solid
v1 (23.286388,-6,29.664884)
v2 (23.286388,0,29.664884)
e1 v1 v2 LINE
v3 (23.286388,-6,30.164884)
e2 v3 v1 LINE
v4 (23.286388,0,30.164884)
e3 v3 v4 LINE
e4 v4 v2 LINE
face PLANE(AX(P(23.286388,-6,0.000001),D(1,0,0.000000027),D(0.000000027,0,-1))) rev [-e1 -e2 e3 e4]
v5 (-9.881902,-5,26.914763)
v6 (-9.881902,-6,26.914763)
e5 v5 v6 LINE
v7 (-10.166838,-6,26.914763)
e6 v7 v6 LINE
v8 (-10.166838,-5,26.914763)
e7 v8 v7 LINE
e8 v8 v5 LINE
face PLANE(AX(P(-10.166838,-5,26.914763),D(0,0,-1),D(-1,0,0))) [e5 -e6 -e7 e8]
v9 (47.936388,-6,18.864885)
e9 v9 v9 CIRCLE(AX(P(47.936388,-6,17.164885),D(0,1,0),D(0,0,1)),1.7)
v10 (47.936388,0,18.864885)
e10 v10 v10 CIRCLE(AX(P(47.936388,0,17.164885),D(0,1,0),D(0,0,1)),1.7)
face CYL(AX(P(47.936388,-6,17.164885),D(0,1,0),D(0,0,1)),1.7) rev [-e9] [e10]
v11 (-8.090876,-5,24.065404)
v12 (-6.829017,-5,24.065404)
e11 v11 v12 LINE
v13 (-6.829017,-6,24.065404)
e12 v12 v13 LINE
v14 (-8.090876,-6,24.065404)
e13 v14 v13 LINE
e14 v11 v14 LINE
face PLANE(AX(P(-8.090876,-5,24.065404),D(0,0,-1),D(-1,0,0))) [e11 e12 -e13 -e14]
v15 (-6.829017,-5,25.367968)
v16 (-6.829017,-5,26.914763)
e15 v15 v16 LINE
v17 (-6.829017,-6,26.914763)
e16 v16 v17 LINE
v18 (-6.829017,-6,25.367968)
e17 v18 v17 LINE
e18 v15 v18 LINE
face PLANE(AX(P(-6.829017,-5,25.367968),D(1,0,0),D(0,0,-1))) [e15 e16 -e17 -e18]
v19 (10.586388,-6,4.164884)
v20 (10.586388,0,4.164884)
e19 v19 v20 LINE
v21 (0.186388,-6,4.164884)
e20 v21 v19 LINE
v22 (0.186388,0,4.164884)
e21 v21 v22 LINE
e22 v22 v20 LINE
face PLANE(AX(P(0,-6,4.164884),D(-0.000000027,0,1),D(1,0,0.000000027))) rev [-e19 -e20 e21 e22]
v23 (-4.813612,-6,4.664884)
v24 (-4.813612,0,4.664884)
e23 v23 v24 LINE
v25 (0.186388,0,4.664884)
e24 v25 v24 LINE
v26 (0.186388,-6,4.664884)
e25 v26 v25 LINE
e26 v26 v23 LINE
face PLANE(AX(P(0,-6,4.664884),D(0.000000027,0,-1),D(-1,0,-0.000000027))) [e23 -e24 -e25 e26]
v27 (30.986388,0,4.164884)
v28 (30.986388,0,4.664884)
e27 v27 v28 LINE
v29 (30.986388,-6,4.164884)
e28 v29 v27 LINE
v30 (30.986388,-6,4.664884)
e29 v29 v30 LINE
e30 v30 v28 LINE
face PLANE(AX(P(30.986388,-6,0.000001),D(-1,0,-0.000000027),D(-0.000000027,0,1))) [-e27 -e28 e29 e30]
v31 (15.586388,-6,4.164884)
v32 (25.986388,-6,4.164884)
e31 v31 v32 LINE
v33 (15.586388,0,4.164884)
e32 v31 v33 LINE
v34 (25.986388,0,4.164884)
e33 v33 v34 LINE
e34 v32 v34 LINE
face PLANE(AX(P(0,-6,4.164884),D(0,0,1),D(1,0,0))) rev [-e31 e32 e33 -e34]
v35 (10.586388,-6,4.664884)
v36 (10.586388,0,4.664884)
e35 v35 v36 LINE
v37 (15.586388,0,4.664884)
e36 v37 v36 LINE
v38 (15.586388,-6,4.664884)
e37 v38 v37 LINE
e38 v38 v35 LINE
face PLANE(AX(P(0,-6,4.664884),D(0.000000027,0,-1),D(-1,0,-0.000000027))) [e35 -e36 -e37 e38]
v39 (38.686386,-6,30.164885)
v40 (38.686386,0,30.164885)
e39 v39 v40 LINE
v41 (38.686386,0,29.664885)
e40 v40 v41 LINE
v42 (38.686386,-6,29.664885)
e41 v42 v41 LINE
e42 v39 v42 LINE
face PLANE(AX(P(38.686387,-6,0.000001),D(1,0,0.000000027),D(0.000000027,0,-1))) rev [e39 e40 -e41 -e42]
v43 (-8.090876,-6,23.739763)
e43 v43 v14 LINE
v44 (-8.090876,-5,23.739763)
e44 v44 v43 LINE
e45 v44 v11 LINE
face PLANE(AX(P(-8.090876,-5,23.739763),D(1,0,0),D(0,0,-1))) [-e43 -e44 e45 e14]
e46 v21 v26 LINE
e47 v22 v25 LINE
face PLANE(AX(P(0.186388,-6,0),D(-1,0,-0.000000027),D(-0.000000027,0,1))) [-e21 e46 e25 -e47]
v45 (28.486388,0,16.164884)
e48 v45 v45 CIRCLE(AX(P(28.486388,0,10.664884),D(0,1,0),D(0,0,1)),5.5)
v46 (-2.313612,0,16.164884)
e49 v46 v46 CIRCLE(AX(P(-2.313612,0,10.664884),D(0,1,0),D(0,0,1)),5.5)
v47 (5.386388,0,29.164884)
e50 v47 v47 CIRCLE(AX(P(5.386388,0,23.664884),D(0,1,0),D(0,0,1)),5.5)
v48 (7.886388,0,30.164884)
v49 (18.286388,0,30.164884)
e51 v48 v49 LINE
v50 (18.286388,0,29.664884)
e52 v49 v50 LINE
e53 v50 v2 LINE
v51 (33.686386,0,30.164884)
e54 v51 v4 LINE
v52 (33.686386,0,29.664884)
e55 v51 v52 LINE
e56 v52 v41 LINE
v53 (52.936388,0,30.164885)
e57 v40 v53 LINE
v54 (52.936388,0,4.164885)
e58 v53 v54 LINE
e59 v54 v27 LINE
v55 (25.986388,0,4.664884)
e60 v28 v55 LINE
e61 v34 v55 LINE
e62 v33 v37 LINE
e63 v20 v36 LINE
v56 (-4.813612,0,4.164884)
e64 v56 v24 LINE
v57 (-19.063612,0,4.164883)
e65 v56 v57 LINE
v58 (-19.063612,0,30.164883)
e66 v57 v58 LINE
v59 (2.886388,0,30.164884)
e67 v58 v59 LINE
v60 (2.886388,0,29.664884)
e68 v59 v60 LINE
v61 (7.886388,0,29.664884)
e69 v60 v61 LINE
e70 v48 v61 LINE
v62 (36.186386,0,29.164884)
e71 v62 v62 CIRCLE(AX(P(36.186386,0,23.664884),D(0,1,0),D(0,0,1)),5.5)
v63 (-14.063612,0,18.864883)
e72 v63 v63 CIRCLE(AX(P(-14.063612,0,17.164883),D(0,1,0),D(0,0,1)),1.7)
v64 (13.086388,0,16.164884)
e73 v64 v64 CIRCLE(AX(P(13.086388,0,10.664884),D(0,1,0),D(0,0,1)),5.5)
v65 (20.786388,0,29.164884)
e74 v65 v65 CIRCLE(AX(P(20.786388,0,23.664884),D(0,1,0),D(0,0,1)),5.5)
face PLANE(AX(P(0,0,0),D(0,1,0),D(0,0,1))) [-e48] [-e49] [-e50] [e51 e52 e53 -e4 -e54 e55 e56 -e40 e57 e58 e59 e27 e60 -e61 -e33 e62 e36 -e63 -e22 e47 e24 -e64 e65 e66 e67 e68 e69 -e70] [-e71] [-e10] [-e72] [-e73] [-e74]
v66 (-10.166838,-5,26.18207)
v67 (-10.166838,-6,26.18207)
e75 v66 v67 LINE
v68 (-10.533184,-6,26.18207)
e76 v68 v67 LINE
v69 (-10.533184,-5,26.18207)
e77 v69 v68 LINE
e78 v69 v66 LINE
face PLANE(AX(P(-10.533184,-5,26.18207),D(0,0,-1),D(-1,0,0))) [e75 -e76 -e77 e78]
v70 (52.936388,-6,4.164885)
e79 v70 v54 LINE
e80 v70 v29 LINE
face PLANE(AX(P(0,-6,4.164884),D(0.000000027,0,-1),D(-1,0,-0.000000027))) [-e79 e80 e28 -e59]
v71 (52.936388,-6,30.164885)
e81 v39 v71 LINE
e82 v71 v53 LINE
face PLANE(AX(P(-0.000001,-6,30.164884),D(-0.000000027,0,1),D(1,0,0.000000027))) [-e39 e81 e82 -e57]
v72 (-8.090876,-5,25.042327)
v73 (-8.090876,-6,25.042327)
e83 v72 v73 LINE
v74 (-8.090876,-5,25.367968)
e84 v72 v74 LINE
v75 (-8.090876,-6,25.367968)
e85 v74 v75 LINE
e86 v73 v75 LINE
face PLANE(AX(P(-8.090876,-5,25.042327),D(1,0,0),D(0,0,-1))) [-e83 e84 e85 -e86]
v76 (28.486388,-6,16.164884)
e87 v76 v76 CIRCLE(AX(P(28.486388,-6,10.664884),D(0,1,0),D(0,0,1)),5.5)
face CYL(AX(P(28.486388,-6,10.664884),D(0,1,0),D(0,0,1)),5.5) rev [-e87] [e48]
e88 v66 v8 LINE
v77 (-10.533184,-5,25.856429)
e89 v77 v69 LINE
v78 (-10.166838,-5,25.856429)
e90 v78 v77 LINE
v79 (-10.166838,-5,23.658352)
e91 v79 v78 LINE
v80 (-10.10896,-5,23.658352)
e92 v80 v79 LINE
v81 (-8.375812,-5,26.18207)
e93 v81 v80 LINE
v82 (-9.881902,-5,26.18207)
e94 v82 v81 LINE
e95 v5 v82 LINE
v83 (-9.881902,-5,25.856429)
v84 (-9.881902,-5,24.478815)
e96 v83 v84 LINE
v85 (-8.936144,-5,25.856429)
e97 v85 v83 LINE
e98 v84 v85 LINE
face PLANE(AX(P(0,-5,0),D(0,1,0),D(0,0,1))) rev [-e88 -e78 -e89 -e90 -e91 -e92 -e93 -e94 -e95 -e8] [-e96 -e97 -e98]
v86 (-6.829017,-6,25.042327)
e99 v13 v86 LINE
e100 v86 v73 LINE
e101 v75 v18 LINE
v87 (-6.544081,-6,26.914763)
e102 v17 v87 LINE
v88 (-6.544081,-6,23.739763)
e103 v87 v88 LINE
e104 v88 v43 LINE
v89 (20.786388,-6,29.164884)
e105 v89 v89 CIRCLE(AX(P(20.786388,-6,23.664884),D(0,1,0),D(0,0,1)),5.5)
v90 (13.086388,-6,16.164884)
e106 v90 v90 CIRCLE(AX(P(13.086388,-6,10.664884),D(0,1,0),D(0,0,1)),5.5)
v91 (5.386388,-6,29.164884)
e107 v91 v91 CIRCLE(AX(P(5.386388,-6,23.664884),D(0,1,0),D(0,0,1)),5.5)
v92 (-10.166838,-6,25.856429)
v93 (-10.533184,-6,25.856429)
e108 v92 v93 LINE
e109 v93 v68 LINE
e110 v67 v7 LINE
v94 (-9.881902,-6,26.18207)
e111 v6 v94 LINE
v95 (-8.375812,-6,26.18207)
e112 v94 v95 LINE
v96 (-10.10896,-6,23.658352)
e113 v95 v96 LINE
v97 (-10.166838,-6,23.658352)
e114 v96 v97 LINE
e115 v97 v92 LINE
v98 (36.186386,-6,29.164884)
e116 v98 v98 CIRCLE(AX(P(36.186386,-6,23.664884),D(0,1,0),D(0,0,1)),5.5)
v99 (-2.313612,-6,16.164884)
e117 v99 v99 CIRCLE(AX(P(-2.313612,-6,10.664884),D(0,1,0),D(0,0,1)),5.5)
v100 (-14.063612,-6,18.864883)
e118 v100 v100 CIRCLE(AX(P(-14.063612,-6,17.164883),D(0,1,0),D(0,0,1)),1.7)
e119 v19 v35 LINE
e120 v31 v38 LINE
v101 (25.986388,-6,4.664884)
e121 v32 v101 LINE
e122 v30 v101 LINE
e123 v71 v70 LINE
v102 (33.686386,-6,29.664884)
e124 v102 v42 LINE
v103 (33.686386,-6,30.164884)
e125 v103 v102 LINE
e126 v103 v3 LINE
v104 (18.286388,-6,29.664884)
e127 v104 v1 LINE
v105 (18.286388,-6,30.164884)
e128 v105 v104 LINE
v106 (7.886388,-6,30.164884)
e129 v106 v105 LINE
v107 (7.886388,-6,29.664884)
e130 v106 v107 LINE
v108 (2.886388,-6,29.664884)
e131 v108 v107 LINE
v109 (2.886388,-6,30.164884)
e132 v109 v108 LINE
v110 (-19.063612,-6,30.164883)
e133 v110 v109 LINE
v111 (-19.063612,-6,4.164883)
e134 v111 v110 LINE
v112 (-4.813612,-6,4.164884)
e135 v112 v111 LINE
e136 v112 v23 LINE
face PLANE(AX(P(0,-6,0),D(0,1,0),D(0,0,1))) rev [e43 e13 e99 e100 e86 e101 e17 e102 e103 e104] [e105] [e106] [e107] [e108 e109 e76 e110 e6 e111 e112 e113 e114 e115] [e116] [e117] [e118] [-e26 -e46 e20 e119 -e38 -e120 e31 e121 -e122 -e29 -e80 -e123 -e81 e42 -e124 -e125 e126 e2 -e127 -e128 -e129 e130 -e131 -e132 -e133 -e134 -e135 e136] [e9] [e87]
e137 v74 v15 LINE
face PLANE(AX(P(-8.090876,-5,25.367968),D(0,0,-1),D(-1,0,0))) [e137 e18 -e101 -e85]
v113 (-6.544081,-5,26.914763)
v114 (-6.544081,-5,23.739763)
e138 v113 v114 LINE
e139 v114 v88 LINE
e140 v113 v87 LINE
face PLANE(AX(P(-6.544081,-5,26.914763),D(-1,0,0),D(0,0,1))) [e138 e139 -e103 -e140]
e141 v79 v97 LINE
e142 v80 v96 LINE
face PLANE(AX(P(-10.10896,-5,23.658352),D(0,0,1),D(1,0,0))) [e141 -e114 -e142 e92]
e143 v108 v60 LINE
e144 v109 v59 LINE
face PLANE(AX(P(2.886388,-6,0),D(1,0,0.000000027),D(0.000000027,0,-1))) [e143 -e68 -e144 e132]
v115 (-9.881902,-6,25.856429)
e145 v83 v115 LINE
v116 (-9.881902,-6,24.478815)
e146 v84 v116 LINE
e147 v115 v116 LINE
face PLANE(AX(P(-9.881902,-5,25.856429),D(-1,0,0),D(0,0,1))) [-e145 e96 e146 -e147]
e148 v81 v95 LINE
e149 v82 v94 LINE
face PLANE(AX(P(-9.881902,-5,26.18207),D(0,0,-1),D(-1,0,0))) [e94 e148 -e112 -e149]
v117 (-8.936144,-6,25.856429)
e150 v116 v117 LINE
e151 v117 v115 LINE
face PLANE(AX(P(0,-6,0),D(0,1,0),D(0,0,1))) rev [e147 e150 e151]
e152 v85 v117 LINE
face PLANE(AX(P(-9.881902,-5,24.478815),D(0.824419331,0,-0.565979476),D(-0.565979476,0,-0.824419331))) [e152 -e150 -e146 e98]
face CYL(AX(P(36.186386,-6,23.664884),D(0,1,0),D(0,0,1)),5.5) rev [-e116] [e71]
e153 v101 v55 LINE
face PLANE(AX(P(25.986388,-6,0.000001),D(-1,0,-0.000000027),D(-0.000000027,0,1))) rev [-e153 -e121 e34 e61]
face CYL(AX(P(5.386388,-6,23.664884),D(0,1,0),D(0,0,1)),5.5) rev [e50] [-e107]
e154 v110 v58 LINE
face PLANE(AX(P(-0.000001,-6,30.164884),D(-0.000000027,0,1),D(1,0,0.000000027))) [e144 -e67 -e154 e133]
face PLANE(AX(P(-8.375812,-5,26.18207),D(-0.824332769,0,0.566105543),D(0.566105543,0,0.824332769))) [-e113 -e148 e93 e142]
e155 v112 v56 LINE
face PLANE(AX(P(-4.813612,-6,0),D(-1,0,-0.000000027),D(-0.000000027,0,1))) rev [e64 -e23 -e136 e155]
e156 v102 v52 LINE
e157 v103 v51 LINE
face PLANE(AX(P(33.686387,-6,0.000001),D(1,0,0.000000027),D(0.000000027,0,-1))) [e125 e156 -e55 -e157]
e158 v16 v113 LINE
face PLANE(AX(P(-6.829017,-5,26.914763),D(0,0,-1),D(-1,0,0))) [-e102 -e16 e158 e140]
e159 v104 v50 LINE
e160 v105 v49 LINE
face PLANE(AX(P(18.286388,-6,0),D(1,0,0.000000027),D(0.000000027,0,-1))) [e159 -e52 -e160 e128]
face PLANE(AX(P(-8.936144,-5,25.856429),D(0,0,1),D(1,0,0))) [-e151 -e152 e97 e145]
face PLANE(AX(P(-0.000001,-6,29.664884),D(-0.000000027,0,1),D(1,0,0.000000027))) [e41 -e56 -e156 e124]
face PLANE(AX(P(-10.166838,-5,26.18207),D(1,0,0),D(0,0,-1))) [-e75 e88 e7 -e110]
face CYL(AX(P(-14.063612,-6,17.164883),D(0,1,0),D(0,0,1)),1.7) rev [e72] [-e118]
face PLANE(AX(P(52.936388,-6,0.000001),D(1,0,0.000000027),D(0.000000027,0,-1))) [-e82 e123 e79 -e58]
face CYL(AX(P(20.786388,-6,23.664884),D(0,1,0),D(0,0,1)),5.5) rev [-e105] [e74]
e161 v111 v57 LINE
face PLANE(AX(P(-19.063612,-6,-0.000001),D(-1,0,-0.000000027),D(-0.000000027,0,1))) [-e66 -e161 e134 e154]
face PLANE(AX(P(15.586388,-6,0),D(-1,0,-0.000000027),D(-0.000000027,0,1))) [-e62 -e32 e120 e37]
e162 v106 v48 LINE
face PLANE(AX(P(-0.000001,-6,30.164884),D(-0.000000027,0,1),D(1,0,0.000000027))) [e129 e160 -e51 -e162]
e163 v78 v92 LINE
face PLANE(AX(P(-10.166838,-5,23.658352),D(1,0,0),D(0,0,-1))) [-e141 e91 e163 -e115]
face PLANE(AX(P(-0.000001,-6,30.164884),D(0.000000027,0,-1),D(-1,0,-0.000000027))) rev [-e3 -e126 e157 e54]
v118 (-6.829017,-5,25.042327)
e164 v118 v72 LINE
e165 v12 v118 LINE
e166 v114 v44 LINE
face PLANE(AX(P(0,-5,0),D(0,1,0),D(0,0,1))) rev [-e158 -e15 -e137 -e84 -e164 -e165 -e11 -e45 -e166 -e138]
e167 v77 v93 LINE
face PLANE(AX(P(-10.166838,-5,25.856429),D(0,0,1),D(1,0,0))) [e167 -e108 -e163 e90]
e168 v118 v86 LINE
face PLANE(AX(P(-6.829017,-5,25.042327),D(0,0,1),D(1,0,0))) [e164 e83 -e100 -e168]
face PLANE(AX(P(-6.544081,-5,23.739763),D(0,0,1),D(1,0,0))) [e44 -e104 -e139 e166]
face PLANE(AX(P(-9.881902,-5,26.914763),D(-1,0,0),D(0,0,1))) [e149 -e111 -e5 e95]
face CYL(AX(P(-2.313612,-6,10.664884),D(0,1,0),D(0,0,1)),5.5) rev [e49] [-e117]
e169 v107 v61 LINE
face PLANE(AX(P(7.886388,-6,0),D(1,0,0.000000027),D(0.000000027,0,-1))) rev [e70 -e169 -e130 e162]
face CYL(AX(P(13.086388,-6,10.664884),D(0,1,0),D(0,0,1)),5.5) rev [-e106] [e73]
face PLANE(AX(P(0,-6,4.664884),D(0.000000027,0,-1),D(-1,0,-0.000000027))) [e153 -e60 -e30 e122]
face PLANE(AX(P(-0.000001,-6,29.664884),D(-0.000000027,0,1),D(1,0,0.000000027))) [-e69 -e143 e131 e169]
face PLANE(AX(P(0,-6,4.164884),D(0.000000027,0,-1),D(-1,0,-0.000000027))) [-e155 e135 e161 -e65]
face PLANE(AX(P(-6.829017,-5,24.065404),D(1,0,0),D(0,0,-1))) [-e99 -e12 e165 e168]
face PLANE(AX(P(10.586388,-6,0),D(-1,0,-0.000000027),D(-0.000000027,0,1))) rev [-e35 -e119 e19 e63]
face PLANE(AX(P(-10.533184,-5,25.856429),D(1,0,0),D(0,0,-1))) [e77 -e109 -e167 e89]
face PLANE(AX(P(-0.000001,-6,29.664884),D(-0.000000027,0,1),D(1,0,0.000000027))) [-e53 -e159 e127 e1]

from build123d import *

# Parameters (mm, degrees)
SKETCH1_R               = 5.5
BOSS_EXTRUDE1_DEPTH     = 6
BOSS_EXTRUDE1_2_DEPTH   = 6
BOSS_EXTRUDE1_3_DEPTH   = 6
BOSS_EXTRUDE1_4_DEPTH   = 6
BOSS_EXTRUDE1_5_DEPTH   = 6
BOSS_EXTRUDE1_6_DEPTH   = 6
BOSS_EXTRUDE2_START     = -6
BOSS_EXTRUDE2_OUTLINE_R = 1.7
BOSS_EXTRUDE2_DEPTH     = 6
CUT_EXTRUDE1_DEPTH      = 1


# Read off the part's stored shape, not the designer's step: Boss-Extrude2
with BuildPart() as part:
    # Sketch1 → Boss-Extrude1 (new body)
    with BuildSketch(Plane(origin=(0, 0, 0), x_dir=(1, 0, 0), z_dir=(0, 1, 0))):
        Polygon((3.686387934, -16.664883738), (3.686388262, -4.664883738), (-8.313611738, -4.66488341), (-8.313612066, -16.66488341), align=None)
        with Locations(Location((-2.313611902, -10.664883574, 0), (0, 0, 270))):
            Circle(SKETCH1_R, mode=Mode.SUBTRACT)
    extrude(amount=-BOSS_EXTRUDE1_DEPTH)



with BuildPart() as body_2:
    # Sketch1 → Boss-Extrude1 2 (new body)
    with BuildSketch(Plane(origin=(0, 0, 0), x_dir=(1, 0, 0), z_dir=(0, 1, 0))):
        Polygon((19.086387939, -16.664884095), (19.086388267, -4.664884095), (7.086388267, -4.664883767), (7.086387939, -16.664883767), align=None)
        with Locations(Location((13.086388103, -10.664883931, 0), (0, 0, 270))):
            Circle(SKETCH1_R, mode=Mode.SUBTRACT)
    extrude(amount=-BOSS_EXTRUDE1_2_DEPTH)


with BuildPart() as body_3:
    # Sketch1 → Boss-Extrude1 3 (new body)
    with BuildSketch(Plane(origin=(0, 0, 0), x_dir=(1, 0, 0), z_dir=(0, 1, 0))):
        Polygon((34.486387949, -16.66488445), (34.486388277, -4.66488445), (22.486388277, -4.664884122), (22.486387949, -16.664884122), align=None)
        with Locations(Location((28.486388113, -10.664884286, 0), (0, 0, 270))):
            Circle(SKETCH1_R, mode=Mode.SUBTRACT)
    extrude(amount=-BOSS_EXTRUDE1_3_DEPTH)


with BuildPart() as body_4:
    # Sketch1 → Boss-Extrude1 4 (new body)
    with BuildSketch(Plane(origin=(0, 0, 0), x_dir=(1, 0, 0), z_dir=(0, 1, 0))):
        Polygon((14.786387887, -17.664883977), (14.786387559, -29.664883977), (26.786387559, -29.664884305), (26.786387887, -17.664884305), align=None)
        with Locations(Location((20.786387723, -23.664884141, 0), (0, 0, 270))):
            Circle(SKETCH1_R, mode=Mode.SUBTRACT)
    extrude(amount=-BOSS_EXTRUDE1_4_DEPTH)


with BuildPart() as body_5:
    # Sketch1 → Boss-Extrude1 5 (new body)
    with BuildSketch(Plane(origin=(0, 0, 0), x_dir=(1, 0, 0), z_dir=(0, 1, 0))):
        Polygon((30.186386338, -17.664884333), (30.18638601, -29.664884333), (42.18638601, -29.664884661), (42.186386338, -17.664884661), align=None)
        with Locations(Location((36.186386174, -23.664884497, 0), (0, 0, 270))):
            Circle(SKETCH1_R, mode=Mode.SUBTRACT)
    extrude(amount=-BOSS_EXTRUDE1_5_DEPTH)


with BuildPart() as body_6:
    # Sketch1 → Boss-Extrude1 6 (new body)
    with BuildSketch(Plane(origin=(0, 0, 0), x_dir=(1, 0, 0), z_dir=(0, 1, 0))):
        Polygon((-0.613612103, -17.664883618), (-0.613612431, -29.664883618), (11.386387569, -29.664883947), (11.386387897, -17.664883947), align=None)
        with Locations(Location((5.386387733, -23.664883782, 0), (0, 0, 270))):
            Circle(SKETCH1_R, mode=Mode.SUBTRACT)
    extrude(amount=-BOSS_EXTRUDE1_6_DEPTH)


with BuildPart() as part_1:
    add(part.part)

    add(body_2.part)  # Boss-Extrude2 merges body 2

    add(body_3.part)  # Boss-Extrude2 merges body 3

    add(body_4.part)  # Boss-Extrude2 merges body 4

    add(body_5.part)  # Boss-Extrude2 merges body 5

    add(body_6.part)  # Boss-Extrude2 merges body 6
    # Boss-Extrude2 outline → Boss-Extrude2 (add)
    with BuildSketch(Plane(origin=(0, 0, 0), x_dir=(1, 0, 0), z_dir=(0, 1, 0)).offset(BOSS_EXTRUDE2_START)):
        Polygon((10.586388281, -4.164883862), (0.186388276, -4.164883578), (0.186388262, -4.664883642), (3.686388262, -4.664883738), (3.686387934, -16.664883738), (-8.313612066, -16.66488341), (-8.313611738, -4.66488341), (-4.813611738, -4.664883506), (-4.813611724, -4.164883505), (-19.063611735, -4.164883116), (-19.063612446, -30.164883114), (2.886387555, -30.164883714), (2.886387569, -29.664883714), (-0.613612431, -29.664883618), (-0.613612103, -17.664883618), (11.386387897, -17.664883947), (11.386387569, -29.664883947), (7.886387569, -29.664883851), (7.886387555, -30.164883851), (18.286387545, -30.164884073), (18.286387559, -29.664884073), (14.786387559, -29.664883977), (14.786387887, -17.664883977), (26.786387887, -17.664884305), (26.786387559, -29.664884305), (23.286387559, -29.664884209), (23.286387545, -30.16488421), (33.686385997, -30.164884494), (33.68638601, -29.664884428), (30.18638601, -29.664884333), (30.186386338, -17.664884333), (42.186386338, -17.664884661), (42.18638601, -29.664884661), (38.68638601, -29.664884565), (38.686385997, -30.164884565), (52.936387554, -30.164884954), (52.936388265, -4.164885084), (30.986388291, -4.164884354), (30.986388277, -4.664884354), (34.486388277, -4.66488445), (34.486387949, -16.66488445), (22.486387949, -16.664884122), (22.486388277, -4.664884122), (25.986388277, -4.664884218), (25.986388291, -4.164884218), (15.586388281, -4.164884108), (15.586388267, -4.664883999), (19.086388267, -4.664884095), (19.086387939, -16.664884095), (7.086387939, -16.664883767), (7.086388267, -4.664883767), (10.586388267, -4.664883863), align=None)
        with Locations((47.93638791, -17.164884883)):
            Circle(BOSS_EXTRUDE2_OUTLINE_R, mode=Mode.SUBTRACT)
        with Locations((-14.06361209, -17.164883252)):
            Circle(BOSS_EXTRUDE2_OUTLINE_R, mode=Mode.SUBTRACT)
    extrude(amount=BOSS_EXTRUDE2_DEPTH)

    # Sketch2 → Cut-Extrude1 (cut)
    # profile 1 of 2: a face of its own
    with BuildSketch(Plane(origin=(0, -6, 0), x_dir=(-1, 0, 0), z_dir=(0, -1, 0))):
        Polygon((6.544081332, -23.739762668), (8.090876204, -23.739762668), (8.090876204, -24.065403693), (6.829017229, -24.065403693), (6.829017229, -25.04232677), (8.090876204, -25.04232677), (8.090876204, -25.367967796), (6.829017229, -25.367967796), (6.829017229, -26.914762668), (6.544081332, -26.914762668), align=None)
    # profile 2 of 2: a face of its own
    with BuildSketch(Plane(origin=(0, -6, 0), x_dir=(-1, 0, 0), z_dir=(0, -1, 0))):
        Polygon((10.108960138, -23.658352411), (10.166837742, -23.658352411), (10.166837742, -25.856429335), (10.533183896, -25.856429335), (10.533183896, -26.18207036), (10.166837742, -26.18207036), (10.166837742, -26.914762668), (9.881901845, -26.914762668), (9.881901845, -26.18207036), (8.375812101, -26.18207036), align=None)
        Polygon((9.881901845, -25.856429335), (9.881901845, -24.478815152), (8.936143631, -25.856429335), align=None, mode=Mode.SUBTRACT)
    extrude(amount=-CUT_EXTRUDE1_DEPTH, mode=Mode.SUBTRACT)


solid = part_1.part
